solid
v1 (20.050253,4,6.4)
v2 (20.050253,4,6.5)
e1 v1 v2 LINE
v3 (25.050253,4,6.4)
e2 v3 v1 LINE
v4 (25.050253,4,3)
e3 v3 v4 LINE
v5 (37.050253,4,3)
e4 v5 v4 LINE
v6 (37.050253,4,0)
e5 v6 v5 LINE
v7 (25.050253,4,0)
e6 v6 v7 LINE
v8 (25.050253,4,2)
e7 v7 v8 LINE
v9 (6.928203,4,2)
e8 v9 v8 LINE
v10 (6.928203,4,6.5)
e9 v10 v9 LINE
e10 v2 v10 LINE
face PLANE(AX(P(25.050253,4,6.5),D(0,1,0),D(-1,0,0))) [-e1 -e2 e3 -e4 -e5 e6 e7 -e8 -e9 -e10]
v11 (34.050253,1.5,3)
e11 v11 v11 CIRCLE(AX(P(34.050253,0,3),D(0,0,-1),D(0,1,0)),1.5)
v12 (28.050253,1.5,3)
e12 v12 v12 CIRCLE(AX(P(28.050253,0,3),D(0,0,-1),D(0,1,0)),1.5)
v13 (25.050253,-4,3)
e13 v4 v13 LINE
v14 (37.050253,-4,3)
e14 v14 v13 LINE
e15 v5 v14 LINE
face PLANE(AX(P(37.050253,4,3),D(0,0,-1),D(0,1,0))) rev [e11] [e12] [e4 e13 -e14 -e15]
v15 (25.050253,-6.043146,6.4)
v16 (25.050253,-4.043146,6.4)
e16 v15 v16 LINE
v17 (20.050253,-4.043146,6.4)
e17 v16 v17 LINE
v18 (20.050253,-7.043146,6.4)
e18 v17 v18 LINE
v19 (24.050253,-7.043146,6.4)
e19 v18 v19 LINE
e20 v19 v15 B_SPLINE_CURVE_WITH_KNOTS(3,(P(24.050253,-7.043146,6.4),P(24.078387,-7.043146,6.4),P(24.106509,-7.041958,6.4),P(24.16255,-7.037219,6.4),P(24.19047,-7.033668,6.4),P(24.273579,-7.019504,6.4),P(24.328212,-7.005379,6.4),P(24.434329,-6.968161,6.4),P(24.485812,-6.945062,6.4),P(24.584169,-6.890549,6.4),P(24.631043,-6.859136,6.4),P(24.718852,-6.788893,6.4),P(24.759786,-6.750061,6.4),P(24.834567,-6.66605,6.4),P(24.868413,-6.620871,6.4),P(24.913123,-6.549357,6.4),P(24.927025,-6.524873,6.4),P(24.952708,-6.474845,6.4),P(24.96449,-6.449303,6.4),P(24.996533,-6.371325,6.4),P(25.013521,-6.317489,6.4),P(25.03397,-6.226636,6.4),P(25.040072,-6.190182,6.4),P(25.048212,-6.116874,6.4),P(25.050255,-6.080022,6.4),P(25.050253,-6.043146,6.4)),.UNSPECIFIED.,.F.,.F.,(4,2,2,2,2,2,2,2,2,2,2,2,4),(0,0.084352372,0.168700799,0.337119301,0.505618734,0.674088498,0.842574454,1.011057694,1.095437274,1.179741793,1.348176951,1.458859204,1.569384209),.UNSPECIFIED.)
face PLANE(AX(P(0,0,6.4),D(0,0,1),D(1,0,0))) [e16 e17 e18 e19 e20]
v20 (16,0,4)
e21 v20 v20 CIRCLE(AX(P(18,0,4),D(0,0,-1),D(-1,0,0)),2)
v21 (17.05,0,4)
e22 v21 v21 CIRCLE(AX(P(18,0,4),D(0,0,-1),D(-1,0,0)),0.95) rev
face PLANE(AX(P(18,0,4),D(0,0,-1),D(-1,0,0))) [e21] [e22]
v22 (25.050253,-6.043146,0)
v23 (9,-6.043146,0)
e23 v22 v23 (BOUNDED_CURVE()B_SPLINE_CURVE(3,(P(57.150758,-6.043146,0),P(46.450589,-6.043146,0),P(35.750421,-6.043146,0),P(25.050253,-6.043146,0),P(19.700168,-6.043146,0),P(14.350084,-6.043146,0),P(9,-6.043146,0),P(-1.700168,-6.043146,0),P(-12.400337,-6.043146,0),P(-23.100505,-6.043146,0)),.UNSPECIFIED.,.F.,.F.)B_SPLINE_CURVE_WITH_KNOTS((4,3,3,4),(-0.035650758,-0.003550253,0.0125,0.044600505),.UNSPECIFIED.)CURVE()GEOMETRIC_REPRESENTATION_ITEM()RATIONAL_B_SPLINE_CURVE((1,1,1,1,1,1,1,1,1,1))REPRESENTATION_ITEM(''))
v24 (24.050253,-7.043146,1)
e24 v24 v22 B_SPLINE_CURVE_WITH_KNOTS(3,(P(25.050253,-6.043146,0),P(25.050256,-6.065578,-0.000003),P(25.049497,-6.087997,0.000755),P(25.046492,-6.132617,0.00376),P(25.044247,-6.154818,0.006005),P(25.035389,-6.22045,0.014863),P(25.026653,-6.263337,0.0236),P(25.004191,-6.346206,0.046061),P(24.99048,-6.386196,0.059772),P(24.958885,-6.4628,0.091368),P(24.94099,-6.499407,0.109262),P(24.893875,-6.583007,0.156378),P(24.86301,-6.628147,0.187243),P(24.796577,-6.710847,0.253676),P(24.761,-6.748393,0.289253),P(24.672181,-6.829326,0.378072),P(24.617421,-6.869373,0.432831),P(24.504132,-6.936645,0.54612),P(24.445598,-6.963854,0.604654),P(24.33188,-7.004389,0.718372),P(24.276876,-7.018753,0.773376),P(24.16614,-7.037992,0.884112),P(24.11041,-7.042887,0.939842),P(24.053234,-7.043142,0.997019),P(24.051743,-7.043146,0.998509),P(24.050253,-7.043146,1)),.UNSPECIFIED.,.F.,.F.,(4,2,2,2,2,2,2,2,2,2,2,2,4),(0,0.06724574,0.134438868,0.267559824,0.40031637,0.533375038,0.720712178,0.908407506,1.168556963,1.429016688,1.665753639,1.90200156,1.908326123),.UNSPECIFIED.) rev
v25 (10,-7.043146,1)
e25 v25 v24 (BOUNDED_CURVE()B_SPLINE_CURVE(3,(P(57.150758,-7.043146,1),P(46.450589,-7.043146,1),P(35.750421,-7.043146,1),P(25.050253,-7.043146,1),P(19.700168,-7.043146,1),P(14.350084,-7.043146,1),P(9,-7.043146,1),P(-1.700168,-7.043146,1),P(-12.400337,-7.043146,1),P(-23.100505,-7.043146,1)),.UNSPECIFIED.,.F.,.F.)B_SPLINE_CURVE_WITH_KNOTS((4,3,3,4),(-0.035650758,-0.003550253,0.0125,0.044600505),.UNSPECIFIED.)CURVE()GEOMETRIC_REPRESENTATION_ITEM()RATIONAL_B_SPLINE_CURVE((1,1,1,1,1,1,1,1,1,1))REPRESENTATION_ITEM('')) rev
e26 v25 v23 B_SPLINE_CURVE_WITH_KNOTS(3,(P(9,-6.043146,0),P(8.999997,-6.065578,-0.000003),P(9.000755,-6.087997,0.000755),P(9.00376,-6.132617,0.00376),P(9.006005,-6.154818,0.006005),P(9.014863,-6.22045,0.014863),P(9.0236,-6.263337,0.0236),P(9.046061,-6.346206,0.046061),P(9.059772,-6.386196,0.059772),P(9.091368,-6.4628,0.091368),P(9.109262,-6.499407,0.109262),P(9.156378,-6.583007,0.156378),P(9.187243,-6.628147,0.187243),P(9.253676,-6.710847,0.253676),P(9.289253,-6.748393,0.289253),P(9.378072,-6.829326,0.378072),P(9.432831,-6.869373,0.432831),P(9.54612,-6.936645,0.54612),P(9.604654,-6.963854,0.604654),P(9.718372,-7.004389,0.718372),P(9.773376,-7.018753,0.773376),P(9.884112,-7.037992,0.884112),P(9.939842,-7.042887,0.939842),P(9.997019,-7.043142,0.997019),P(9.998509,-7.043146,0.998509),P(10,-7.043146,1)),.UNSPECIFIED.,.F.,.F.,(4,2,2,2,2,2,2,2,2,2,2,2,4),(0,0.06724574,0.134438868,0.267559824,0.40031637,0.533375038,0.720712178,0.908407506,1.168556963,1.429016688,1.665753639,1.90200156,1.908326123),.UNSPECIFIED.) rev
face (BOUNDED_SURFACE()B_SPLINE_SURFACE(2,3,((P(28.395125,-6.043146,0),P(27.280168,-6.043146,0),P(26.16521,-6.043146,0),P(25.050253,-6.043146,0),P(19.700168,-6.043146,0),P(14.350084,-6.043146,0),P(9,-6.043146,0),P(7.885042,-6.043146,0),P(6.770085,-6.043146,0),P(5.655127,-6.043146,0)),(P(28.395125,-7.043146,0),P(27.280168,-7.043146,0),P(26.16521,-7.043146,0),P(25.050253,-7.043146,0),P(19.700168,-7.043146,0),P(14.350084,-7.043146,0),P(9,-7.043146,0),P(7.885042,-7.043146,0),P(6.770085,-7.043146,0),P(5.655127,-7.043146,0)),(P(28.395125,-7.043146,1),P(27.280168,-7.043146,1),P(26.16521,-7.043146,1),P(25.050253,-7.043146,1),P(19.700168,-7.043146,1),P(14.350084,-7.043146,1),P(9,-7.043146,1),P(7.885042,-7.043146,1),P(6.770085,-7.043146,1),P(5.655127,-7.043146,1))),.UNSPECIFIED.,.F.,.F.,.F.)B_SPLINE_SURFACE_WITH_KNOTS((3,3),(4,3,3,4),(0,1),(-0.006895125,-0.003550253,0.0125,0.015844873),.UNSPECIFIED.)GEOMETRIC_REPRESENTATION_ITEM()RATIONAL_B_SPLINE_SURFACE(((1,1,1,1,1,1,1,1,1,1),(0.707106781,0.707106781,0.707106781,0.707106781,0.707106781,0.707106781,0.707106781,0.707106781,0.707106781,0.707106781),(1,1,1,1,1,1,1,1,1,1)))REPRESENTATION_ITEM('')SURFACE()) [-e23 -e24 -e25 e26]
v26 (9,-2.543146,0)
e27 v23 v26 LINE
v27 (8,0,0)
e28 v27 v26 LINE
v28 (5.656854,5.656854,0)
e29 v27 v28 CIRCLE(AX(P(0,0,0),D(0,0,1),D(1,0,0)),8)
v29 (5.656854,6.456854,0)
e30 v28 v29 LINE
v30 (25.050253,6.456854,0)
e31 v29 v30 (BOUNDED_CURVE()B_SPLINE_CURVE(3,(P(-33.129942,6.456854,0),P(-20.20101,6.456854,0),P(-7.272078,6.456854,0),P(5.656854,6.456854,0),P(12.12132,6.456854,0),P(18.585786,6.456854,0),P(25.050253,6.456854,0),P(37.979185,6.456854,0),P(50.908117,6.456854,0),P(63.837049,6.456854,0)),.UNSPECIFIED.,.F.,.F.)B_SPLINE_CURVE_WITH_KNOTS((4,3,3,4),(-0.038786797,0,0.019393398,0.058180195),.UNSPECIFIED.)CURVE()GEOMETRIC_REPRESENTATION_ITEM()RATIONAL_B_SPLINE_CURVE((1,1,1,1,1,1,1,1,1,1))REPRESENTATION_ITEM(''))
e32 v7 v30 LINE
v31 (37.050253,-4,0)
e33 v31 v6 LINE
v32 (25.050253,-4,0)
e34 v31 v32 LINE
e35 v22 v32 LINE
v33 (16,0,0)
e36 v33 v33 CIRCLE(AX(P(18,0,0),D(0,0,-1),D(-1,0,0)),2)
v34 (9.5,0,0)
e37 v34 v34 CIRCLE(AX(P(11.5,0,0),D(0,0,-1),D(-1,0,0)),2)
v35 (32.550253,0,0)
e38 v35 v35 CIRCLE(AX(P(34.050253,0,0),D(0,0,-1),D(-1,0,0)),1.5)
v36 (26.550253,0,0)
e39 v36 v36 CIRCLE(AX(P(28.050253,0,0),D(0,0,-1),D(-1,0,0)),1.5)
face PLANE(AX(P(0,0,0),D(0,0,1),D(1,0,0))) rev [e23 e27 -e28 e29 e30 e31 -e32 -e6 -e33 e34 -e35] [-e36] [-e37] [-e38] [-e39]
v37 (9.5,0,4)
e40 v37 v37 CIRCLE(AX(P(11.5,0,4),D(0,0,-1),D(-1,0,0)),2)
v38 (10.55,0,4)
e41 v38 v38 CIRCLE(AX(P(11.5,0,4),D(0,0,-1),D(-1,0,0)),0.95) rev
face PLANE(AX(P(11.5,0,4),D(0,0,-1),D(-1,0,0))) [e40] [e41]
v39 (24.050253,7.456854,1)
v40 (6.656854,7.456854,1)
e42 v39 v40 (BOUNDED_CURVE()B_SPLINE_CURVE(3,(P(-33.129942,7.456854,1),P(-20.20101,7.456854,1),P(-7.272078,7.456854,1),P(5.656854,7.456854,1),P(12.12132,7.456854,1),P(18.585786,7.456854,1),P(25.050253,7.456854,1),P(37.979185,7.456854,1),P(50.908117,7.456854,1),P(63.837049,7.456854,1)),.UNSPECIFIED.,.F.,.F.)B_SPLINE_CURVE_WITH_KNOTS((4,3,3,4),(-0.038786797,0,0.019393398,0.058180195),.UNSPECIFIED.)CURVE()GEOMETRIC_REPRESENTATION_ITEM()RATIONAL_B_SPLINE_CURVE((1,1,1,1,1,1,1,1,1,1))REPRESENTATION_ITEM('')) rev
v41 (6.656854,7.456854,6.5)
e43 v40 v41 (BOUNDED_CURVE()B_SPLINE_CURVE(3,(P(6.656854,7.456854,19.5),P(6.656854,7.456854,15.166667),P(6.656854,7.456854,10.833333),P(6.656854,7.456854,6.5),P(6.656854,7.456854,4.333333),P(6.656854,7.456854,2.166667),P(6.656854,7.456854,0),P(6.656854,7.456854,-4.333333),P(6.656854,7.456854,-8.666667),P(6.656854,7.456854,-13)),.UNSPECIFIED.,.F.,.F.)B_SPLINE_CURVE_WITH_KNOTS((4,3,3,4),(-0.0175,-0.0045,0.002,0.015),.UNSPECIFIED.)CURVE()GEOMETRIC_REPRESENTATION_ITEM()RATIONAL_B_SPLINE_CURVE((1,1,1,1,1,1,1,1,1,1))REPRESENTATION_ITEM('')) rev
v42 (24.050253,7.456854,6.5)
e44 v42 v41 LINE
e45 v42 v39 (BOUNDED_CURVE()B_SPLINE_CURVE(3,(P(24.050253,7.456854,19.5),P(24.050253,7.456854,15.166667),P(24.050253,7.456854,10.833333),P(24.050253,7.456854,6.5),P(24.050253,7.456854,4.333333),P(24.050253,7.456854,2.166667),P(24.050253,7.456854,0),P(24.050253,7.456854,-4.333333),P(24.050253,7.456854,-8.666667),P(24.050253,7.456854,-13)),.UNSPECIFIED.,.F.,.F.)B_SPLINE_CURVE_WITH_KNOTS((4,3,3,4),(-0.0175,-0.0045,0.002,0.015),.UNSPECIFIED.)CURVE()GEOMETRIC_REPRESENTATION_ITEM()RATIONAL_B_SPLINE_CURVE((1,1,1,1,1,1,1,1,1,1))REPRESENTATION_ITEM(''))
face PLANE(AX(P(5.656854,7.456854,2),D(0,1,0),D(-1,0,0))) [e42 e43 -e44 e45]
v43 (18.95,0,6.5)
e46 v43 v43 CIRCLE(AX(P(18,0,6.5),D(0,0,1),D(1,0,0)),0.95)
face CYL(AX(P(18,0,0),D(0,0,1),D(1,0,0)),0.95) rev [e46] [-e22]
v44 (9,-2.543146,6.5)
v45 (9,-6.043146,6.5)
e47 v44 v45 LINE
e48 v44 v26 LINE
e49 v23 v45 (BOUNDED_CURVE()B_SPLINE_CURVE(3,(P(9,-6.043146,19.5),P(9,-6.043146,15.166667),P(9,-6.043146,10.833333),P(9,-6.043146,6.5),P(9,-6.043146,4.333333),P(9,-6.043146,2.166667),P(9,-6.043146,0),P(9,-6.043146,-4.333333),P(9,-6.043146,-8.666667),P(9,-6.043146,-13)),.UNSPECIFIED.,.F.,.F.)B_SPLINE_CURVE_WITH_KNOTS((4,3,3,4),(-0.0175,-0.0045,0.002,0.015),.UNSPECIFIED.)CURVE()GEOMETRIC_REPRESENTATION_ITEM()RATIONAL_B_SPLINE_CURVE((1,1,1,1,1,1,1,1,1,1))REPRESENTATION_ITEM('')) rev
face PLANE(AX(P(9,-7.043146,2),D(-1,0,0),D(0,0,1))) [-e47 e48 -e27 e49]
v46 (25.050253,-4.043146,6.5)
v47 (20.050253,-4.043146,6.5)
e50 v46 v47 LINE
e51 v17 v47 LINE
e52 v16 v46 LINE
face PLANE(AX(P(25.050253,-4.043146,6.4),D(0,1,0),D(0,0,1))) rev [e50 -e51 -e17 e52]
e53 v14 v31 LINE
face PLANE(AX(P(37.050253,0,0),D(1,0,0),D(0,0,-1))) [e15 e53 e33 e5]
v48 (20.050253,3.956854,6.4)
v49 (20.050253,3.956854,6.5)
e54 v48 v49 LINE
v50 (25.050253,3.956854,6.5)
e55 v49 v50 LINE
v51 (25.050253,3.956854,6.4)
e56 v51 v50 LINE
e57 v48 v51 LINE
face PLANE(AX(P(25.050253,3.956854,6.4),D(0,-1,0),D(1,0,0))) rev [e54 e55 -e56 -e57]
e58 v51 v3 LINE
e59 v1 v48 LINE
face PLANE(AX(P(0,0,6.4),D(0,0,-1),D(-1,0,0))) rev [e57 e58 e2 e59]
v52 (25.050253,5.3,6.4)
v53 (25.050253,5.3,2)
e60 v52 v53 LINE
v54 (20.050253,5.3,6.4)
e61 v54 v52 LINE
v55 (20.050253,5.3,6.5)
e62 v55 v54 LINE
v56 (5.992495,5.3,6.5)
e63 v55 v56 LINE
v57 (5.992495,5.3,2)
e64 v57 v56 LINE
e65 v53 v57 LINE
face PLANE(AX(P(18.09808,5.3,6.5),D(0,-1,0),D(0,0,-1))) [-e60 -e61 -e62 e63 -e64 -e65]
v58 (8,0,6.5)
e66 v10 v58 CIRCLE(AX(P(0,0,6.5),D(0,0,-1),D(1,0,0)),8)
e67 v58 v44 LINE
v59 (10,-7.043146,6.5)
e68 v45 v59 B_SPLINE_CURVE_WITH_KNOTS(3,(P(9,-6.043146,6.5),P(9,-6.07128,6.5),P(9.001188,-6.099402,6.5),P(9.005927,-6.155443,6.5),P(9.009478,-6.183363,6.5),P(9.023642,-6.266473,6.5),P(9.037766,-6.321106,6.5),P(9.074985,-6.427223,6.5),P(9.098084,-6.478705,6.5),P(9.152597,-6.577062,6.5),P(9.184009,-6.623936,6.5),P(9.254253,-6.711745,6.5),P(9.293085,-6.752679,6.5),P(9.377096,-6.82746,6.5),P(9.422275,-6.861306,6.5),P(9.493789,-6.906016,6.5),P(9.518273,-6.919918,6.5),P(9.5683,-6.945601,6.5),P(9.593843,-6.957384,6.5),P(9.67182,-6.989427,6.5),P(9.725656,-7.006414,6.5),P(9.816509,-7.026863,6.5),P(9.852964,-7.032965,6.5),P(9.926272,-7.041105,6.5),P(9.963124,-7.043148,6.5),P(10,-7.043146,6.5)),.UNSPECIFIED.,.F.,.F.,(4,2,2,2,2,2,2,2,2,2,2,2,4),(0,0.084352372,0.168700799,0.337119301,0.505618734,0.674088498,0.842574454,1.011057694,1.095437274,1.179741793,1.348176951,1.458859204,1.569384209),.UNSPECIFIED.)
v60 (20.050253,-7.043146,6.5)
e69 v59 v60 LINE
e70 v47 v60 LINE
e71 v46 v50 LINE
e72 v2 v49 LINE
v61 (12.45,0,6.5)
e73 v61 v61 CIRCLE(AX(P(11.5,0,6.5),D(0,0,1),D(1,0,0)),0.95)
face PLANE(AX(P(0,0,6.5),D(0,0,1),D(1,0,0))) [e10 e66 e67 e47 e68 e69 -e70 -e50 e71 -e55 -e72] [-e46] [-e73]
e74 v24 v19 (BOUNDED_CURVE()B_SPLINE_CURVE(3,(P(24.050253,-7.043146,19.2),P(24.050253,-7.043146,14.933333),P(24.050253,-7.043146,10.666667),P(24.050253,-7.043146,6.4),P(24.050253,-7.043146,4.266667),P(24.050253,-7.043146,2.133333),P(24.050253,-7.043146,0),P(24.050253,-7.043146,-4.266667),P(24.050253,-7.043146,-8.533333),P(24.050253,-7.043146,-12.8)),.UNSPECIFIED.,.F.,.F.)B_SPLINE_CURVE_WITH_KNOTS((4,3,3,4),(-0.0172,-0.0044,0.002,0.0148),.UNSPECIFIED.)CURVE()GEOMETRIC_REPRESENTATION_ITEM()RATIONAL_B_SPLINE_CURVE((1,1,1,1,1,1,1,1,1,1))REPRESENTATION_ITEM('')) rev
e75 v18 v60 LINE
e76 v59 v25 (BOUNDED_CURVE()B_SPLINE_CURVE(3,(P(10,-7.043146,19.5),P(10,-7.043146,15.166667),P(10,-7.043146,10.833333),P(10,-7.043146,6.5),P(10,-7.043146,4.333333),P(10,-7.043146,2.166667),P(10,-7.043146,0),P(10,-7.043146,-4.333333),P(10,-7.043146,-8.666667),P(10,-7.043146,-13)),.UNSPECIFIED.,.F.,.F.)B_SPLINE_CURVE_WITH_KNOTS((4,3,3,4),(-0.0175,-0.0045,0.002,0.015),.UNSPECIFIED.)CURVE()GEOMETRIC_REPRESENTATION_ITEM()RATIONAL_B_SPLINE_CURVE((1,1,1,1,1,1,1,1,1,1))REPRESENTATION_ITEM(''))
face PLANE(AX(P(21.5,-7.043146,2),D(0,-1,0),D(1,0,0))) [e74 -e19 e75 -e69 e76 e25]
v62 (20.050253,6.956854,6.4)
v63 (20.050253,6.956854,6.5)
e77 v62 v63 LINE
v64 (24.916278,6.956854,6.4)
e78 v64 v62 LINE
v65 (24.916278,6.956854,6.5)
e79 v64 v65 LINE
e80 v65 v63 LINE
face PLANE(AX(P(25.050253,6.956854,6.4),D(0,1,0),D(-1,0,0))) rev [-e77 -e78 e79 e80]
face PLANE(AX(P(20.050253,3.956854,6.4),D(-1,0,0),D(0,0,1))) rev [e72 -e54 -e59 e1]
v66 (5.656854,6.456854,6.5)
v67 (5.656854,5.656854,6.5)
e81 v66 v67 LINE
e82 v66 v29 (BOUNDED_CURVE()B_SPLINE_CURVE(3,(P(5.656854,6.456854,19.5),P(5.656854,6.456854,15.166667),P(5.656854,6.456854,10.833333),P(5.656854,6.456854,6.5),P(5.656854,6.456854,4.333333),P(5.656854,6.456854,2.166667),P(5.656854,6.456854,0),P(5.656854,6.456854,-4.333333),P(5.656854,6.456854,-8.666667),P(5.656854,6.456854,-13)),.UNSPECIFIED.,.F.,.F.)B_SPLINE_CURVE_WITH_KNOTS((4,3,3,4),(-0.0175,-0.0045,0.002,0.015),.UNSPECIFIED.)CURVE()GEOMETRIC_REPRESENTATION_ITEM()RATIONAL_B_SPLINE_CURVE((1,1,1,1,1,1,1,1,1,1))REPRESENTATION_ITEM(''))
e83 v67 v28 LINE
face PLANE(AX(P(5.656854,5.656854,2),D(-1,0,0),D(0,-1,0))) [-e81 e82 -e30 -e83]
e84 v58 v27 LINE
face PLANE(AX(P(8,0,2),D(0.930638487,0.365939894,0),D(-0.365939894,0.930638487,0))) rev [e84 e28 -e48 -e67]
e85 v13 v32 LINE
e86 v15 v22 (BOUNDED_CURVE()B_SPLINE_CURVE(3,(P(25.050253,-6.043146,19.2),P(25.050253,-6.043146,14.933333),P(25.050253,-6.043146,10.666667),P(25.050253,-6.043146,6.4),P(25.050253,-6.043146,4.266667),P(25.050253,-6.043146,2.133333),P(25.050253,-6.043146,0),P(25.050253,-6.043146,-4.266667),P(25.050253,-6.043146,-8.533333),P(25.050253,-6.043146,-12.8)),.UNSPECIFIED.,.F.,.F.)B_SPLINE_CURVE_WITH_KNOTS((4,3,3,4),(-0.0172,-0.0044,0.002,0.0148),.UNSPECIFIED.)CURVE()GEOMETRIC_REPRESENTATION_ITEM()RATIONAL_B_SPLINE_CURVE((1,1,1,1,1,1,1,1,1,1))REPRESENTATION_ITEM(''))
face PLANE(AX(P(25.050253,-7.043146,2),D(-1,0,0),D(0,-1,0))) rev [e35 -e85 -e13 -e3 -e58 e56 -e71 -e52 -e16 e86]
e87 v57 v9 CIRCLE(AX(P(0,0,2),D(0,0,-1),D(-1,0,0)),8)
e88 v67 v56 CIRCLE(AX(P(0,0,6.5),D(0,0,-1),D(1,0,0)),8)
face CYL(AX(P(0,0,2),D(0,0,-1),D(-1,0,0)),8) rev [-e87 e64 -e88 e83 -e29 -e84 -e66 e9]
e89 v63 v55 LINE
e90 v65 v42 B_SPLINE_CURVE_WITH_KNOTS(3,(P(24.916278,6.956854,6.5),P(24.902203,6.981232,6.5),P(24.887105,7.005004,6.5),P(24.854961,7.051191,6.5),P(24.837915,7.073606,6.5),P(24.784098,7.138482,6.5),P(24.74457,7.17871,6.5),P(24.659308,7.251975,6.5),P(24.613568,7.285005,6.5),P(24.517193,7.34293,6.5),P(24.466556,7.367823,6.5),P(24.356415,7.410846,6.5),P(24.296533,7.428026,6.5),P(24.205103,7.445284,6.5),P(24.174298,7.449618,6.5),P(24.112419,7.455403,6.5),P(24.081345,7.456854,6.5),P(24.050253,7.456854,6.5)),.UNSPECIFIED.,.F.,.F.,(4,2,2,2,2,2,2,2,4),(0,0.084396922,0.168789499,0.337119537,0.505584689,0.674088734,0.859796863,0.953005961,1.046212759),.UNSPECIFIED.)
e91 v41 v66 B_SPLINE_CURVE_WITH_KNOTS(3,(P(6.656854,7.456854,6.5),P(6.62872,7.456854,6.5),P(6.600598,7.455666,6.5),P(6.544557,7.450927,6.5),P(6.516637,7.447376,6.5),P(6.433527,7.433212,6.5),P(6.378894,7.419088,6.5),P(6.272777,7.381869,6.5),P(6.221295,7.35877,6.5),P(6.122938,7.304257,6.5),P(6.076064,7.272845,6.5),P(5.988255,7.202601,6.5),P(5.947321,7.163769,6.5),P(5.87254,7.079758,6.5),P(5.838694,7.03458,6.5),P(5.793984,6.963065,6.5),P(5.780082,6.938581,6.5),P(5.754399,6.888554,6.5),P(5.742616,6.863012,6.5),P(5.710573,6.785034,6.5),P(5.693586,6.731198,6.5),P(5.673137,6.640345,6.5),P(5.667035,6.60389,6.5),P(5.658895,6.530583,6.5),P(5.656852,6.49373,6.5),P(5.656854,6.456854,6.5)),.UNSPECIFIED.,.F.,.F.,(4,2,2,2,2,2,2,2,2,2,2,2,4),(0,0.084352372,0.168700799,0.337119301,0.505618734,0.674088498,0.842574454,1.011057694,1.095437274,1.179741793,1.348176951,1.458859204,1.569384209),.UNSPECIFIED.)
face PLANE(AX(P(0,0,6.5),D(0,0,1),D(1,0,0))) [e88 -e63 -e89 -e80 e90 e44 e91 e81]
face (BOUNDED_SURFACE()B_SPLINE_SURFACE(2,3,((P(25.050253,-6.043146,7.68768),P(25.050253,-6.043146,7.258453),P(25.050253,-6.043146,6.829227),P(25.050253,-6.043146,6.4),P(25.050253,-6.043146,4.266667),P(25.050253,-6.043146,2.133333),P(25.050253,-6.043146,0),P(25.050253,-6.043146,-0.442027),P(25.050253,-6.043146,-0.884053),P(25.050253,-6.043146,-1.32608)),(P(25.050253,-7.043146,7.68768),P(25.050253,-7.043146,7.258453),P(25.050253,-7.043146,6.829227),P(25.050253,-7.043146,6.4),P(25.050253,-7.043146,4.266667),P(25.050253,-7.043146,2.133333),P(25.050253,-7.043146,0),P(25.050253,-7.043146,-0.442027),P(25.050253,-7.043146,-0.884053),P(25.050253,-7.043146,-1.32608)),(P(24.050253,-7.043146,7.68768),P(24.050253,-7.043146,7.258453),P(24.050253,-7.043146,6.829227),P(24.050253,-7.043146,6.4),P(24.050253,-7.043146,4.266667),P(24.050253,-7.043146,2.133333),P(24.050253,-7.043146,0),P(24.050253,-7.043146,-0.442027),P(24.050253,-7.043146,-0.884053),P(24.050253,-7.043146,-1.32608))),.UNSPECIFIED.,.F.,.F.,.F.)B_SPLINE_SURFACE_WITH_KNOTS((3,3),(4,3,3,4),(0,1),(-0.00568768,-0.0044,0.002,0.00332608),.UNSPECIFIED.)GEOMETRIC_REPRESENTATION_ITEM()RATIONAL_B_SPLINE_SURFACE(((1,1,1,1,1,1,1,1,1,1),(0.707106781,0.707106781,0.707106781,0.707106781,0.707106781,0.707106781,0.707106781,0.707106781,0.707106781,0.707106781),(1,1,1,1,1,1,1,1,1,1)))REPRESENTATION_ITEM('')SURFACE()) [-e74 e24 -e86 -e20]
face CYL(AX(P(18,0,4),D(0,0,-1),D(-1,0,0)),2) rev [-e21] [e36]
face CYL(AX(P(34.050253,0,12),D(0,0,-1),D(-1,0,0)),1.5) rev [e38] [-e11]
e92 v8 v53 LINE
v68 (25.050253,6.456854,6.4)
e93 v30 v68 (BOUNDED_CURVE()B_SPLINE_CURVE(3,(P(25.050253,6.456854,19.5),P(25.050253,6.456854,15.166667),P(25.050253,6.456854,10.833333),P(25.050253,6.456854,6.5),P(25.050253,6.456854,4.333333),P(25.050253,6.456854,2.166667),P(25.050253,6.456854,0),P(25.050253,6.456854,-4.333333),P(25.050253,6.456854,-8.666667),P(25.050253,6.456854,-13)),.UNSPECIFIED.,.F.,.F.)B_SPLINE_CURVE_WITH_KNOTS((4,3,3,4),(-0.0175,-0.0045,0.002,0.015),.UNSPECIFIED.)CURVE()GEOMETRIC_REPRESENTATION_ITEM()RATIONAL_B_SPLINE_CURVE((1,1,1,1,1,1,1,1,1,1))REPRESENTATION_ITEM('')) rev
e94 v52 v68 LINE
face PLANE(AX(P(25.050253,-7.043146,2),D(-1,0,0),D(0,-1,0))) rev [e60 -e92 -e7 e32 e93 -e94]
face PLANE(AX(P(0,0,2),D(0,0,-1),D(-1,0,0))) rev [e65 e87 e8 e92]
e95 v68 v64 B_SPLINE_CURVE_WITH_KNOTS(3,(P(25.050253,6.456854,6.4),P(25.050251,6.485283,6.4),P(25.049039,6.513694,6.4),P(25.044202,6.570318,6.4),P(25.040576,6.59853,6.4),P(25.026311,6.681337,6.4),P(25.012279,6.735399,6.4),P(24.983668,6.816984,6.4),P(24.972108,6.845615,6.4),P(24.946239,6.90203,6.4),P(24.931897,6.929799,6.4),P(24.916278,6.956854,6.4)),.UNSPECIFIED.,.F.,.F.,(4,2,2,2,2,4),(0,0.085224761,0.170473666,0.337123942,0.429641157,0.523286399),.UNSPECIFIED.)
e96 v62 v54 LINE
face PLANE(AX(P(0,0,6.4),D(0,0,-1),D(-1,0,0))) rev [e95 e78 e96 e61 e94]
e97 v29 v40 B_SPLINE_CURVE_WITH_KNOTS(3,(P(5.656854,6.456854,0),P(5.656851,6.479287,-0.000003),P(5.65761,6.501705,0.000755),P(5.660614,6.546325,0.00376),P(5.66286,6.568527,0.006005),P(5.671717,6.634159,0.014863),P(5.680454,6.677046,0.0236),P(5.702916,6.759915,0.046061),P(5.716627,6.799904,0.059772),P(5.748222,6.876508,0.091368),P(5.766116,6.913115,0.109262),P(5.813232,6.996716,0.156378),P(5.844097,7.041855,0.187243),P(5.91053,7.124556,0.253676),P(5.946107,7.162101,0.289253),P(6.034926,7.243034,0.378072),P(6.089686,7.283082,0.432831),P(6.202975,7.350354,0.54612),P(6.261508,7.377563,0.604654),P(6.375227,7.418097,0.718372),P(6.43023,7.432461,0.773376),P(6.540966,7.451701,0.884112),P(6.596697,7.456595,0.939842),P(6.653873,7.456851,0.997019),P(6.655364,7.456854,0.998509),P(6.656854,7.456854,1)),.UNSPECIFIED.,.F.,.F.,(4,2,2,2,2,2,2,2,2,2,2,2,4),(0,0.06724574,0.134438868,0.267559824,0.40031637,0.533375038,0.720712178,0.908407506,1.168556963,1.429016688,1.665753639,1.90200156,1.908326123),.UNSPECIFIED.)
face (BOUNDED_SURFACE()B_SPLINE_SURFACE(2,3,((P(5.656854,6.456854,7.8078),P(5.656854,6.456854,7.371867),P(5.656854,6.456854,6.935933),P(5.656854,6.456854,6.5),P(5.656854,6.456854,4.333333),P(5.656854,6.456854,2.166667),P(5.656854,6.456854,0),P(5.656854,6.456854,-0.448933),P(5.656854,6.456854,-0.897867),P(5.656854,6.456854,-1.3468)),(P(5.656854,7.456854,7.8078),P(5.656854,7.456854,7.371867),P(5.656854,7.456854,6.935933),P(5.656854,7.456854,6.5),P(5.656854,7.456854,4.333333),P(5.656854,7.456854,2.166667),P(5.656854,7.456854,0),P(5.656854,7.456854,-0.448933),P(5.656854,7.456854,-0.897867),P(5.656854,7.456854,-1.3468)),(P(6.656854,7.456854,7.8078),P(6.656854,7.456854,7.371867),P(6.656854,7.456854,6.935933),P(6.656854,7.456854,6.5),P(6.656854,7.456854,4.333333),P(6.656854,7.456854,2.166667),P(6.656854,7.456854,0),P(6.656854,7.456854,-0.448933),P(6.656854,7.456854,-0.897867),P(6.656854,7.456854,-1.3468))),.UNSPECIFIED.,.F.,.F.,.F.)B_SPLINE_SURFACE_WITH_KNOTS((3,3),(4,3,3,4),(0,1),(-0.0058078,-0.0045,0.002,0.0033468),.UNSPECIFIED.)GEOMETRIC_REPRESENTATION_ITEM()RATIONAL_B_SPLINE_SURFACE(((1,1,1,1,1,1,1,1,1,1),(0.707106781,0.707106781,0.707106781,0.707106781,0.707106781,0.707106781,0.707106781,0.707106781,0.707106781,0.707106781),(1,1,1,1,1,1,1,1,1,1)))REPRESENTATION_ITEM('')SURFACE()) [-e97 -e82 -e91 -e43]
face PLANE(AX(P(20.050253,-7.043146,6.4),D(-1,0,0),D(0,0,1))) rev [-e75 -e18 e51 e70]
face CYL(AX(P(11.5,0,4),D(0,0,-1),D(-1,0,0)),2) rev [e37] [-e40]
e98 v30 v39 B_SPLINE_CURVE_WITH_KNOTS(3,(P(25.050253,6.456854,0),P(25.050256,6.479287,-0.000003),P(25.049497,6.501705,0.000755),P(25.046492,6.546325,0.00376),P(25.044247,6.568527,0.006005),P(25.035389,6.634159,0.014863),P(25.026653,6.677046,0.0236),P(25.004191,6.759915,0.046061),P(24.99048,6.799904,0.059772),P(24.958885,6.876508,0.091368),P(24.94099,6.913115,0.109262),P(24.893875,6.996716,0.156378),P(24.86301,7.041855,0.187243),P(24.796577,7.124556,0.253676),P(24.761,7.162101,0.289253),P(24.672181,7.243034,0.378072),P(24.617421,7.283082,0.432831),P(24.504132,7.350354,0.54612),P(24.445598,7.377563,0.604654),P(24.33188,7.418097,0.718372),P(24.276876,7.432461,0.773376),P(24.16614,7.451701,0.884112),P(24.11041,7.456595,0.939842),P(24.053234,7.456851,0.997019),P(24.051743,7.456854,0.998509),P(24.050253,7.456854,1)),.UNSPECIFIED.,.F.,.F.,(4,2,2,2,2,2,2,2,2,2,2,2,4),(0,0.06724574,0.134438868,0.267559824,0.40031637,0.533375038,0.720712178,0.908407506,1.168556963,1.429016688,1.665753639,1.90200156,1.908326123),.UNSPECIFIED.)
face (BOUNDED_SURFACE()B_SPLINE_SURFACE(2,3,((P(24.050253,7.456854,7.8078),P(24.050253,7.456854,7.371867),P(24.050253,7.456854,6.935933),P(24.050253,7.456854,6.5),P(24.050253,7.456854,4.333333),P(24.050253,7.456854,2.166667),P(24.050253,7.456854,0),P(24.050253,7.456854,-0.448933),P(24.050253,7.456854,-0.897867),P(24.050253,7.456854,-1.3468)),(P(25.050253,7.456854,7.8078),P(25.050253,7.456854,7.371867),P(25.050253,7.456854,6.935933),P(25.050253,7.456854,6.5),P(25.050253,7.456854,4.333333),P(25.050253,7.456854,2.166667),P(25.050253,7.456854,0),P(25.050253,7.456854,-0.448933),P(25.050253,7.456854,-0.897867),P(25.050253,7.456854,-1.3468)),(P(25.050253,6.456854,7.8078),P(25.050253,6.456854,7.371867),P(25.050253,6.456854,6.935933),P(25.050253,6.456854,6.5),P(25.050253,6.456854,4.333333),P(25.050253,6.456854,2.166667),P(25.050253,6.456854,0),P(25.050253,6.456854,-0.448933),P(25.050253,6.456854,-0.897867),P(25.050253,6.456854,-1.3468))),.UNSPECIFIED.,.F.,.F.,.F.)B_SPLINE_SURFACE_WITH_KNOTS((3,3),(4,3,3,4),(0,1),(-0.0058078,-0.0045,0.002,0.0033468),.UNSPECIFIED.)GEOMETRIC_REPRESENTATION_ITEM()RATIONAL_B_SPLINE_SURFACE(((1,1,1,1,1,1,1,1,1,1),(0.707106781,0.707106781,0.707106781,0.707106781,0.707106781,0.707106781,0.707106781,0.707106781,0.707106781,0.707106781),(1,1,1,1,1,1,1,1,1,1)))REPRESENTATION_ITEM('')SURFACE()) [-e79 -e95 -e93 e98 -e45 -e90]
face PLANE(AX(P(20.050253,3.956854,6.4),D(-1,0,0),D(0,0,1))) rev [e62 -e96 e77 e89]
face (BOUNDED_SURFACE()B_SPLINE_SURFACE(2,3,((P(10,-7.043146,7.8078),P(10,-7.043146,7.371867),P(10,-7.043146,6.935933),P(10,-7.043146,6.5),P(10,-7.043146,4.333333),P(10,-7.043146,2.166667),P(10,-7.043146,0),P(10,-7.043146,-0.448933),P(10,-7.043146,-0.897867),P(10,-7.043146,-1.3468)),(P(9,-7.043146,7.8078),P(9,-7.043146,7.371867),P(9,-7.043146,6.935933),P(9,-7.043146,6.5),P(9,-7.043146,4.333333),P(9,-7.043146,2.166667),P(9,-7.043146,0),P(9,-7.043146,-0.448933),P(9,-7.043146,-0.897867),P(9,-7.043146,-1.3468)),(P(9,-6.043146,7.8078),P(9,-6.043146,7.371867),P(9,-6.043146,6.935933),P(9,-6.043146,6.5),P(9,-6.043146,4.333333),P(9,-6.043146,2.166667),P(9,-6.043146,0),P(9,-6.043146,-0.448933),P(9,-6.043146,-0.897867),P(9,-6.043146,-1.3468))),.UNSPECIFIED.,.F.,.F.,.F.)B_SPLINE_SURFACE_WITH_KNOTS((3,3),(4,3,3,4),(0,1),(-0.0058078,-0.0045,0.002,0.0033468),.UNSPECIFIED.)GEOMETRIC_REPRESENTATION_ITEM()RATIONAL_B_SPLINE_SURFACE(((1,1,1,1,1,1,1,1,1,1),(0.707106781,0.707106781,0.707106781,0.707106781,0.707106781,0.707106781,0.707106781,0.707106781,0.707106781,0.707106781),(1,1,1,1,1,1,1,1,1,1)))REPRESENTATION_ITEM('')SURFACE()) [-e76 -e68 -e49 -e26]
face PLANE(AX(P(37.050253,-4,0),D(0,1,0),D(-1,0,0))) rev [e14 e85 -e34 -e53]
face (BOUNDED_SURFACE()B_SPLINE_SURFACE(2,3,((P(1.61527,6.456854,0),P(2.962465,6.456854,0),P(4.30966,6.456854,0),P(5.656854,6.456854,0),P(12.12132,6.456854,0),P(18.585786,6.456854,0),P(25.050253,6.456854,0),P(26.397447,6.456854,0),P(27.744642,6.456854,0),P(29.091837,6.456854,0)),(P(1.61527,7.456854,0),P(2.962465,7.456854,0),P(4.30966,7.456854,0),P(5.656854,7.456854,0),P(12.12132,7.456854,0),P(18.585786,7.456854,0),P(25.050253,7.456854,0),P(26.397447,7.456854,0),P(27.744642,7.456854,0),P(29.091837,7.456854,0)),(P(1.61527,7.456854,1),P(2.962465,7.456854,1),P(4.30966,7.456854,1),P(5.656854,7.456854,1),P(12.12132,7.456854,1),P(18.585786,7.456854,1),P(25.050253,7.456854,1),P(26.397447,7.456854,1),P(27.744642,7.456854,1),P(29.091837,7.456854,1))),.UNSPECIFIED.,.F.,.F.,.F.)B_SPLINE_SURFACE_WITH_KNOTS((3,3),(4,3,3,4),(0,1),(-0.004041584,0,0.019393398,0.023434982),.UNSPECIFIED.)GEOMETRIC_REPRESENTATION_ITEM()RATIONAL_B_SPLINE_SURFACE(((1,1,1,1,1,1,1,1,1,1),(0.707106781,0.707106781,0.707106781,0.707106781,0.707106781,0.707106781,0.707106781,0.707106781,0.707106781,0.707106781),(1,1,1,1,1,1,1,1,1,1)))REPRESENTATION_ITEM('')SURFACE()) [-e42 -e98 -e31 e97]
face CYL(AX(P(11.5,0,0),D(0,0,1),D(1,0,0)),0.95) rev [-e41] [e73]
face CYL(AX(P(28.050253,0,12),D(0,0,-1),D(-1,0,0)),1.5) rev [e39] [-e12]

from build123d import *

# Parameters (mm, degrees)
BOSS_EXTRUDE1_DEPTH      = 2
BOSS_EXTRUDE6_DEPTH      = 4.5
CUT_EXTRUDE6_DEPTH       = 4.5
BOSS_EXTRUDE14_DEPTH     = 2.3
SKETCH32_R               = 3
CUT_EXTRUDE7_DEPTH       = 2.3
SKETCH33_W               = 12.393398282201806
SKETCH33_H               = 2.000000000000001
BOSS_EXTRUDE15_DEPTH     = 1.2
CUT_EXTRUDE8_DEPTH       = 2.4
SKETCH43_R               = 2.5000000000000004
SKETCH43_R_2             = 2.4999999999999982
BOSS_EXTRUDE17_DEPTH     = 1.2
CUT_EXTRUDE11_DEPTH      = 29.420773915365164
CUT_EXTRUDE11_DEPTH_BACK = 29.420773915365164
SKETCH44_R               = 0.9499999999999992
SKETCH44_R_2             = 0.9500000000000008
SKETCH49_R               = 0.7500000000000021
CUT_EXTRUDE13_DEPTH      = 3
FILLET1_R                = 1.5
FILLET3_START            = -1
FILLET3_DEPTH            = 8
FILLET3_START_2          = 5
FILLET3_2_DEPTH          = 21
FILLET3_3_DEPTH          = 8
SKETCH45_R               = 1.9999999999999996
SKETCH45_R_2             = 2.000000000000003
CUT_EXTRUDE15_DEPTH      = 4
FILLET4_R                = 2
BOSS_EXTRUDE18_DEPTH     = 12
SKETCH52_R               = 1.500000000000004
SKETCH52_R_2             = 1.5000000000000007
CUT_EXTRUDE16_DEPTH      = 12


with BuildPart() as part:
    # Sketch3 → Boss-Extrude1 (new body)
    with BuildSketch(Plane.XY):
        with BuildLine():
            Line((8.000000000000002, 0), (8.999999999999995, -2.5431457505076205))
            Line((8.999999999999995, -2.5431457505076205), (8.999999999999995, -7.043145750507605))
            Line((8.999999999999995, -7.043145750507605), (21.50000000000004, -7.043145750507604))
            Line((21.50000000000004, -7.043145750507604), (25.05025253169418, -7.043145750507604))
            Line((25.05025253169418, -7.043145750507604), (25.050252531694177, 7.456854249492383))
            Line((25.050252531694177, 7.456854249492383), (5.656854249492373, 7.456854249492379))
            Line((5.656854249492373, 7.456854249492379), (5.656854249492376, 5.656854249492382))
            ThreePointArc((5.656854249492376, 5.656854249492382), (7.391036260090296, 3.061467458920721), (8.000000000000002, 0))
        make_face()
    extrude(amount=BOSS_EXTRUDE1_DEPTH)

    # Sketch22 → Boss-Extrude6 (add)
    with BuildSketch(Plane.XY.offset(2)):
        with BuildLine():
            Line((5.656854249492378, 7.456854249492383), (21.500000000000025, 7.456854249492383))
            Line((21.500000000000025, 7.456854249492383), (25.050252531694177, 7.456854249492383))
            Line((25.050252531694177, 7.456854249492383), (25.05025253169418, -7.043145750507604))
            Line((25.05025253169418, -7.043145750507604), (8.999999999999995, -7.043145750507605))
            Line((8.999999999999995, -7.043145750507605), (8.999999999999995, -2.5431457505076205))
            Line((8.999999999999995, -2.5431457505076205), (7.999999999999998, 0))
            ThreePointArc((7.999999999999998, 0), (7.391036260090291, 3.061467458920719), (5.656854249492376, 5.656854249492382))
            Line((5.656854249492376, 5.656854249492382), (5.656854249492378, 7.456854249492383))
        make_face()
    extrude(amount=BOSS_EXTRUDE6_DEPTH)

    # Sketch26 → Cut-Extrude6 (cut)
    with BuildSketch(Plane.XY.offset(2)):
        Polygon((18.098080447707712, 5.299999999999999), (2.5300524575164793, 5.299999999999999), (2.5300524575164793, 4), (18.098080447707712, 4), (25.05025253169419, 4.000000000000001), (25.05025253169419, 5.299999999999999), align=None)
    extrude(amount=CUT_EXTRUDE6_DEPTH, mode=Mode.SUBTRACT)


with BuildPart() as body_2:
    # Sketch31 → Boss-Extrude14 (new body)
    with BuildSketch(Plane.XY.offset(6.5)):
        with BuildLine():
            Line((2.4326880657739025, 5.656854247099344), (0.00016454221484158, 5.656854247099344))
            ThreePointArc((0.00016454221484158, 5.656854247099344), (-5.656854248894122, 8.227110743131e-05), (0, -5.656854249492382))
            Line((0, -5.656854249492382), (9.000000000000004, -5.656854249492382))
            Line((9.000000000000004, -5.656854249492382), (8.999999999999995, -7.043145750507605))
            Line((8.999999999999995, -7.043145750507605), (8.999999999999995, -8.543145750507605))
            Line((8.999999999999995, -8.543145750507605), (21.50000000000004, -8.543145750507605))
            Line((21.50000000000004, -8.543145750507605), (21.50000000000004, -7.043145750507605))
            Line((21.50000000000004, -7.043145750507605), (25.05025253169418, -7.043145750507604))
            Line((25.05025253169418, -7.043145750507604), (25.05025253169418, 8.956854249492379))
            Line((25.05025253169418, 8.956854249492379), (5.656854249492376, 8.956854249492379))
            Line((5.656854249492376, 8.956854249492379), (5.656854249492378, 7.456854249492383))
            Line((5.656854249492378, 7.456854249492383), (5.656854249492376, 5.613708498984764))
            Line((5.656854249492376, 5.613708498984764), (2.4326880657739025, 5.656854247099344))
        make_face()
    extrude(amount=BOSS_EXTRUDE14_DEPTH)

    # Sketch32 → Cut-Extrude7 (cut)
    with BuildSketch(Plane.XY.offset(8.799999999999999)):
        Circle(SKETCH32_R)
    extrude(amount=-CUT_EXTRUDE7_DEPTH, mode=Mode.SUBTRACT)

    # Sketch33 → Boss-Extrude15 (add)
    with BuildSketch(Plane.XY.offset(8.799999999999999)):
        with Locations((11.853553390593277, 7.956854249492379)):
            Rectangle(SKETCH33_W, SKETCH33_H)
        Polygon((9.000000000000004, -7.043145750507606), (9.000000000000004, -8.543145750507605), (18.05025253169418, -8.543145750507605), (18.05025253169418, -7.0431457505076045), align=None)
        with BuildLine():
            Line((7.000000000000003, -4.156854249492383), (18.05025253169419, -4.156854249492383))
            Line((18.05025253169419, -4.156854249492383), (18.05025253169419, -2.1568542494923824))
            Line((18.05025253169419, -2.1568542494923824), (7.000000000000003, -2.1568542494923832))
            ThreePointArc((7.000000000000003, -2.1568542494923832), (6.000000000000003, -3.1568542494923832), (7.000000000000003, -4.156854249492383))
        make_face()
        with BuildLine():
            Line((18.05025253169419, 2.172006245196199), (7.000000000000003, 2.172006245196201))
            ThreePointArc((7.000000000000003, 2.172006245196201), (6.0000000000000036, 3.1720062451962), (7.000000000000003, 4.172006245196199))
            Line((7.000000000000003, 4.172006245196199), (18.05025253169419, 4.172006245196199))
            Line((18.05025253169419, 4.172006245196199), (18.05025253169419, 2.172006245196199))
        make_face()
    extrude(amount=BOSS_EXTRUDE15_DEPTH)


with BuildPart() as cut_extrude8_tool:
    # Sketch35 → Cut-Extrude8 (new body)
    with BuildSketch(Plane.XY.offset(8.799999999999999)):
        Polygon((25.05025253169418, 3.956854249492379), (25.05025253169418, 6.9568542494923795), (20.05025253169418, 6.956854249492378), (20.05025253169418, 3.9568542494923773), align=None)
        Polygon((25.05025253169418, -7.043145750507604), (20.05025253169419, -7.0431457505076045), (20.05025253169419, -4.043145750507604), (25.05025253169418, -4.043145750507604), align=None)
    extrude(amount=-CUT_EXTRUDE8_DEPTH)


with BuildPart() as part_1:
    add(part.part)

    # Cut-Extrude8: cut by cut_extrude8_tool
    add(cut_extrude8_tool.part, mode=Mode.SUBTRACT)


with BuildPart() as body_2_1:
    add(body_2.part)

    # Cut-Extrude8: cut by cut_extrude8_tool
    add(cut_extrude8_tool.part, mode=Mode.SUBTRACT)

    # Sketch43 → Boss-Extrude17 (add)
    with BuildSketch(Plane.XY.offset(8.799999999999999)):
        with Locations((11.500000000000004, 0)):
            Circle(SKETCH43_R)
        with Locations((18.000000000000004, 0)):
            Circle(SKETCH43_R_2)
    extrude(amount=BOSS_EXTRUDE17_DEPTH)


with BuildPart() as cut_extrude11_tool:
    # Sketch44 → Cut-Extrude11 (new, two sides: drawn at the far end of the back side and taken through both)
    with BuildSketch(Plane.XY.offset(9.999999999999998).offset(-CUT_EXTRUDE11_DEPTH_BACK)):
        with Locations((11.500000000000004, 0)):
            Circle(SKETCH44_R)
        with Locations((18.000000000000004, 0)):
            Circle(SKETCH44_R_2)
    extrude(amount=CUT_EXTRUDE11_DEPTH + CUT_EXTRUDE11_DEPTH_BACK)


with BuildPart() as part_2:
    add(part_1.part)

    # Cut-Extrude11: cut by cut_extrude11_tool
    add(cut_extrude11_tool.part, mode=Mode.SUBTRACT)

    # Fillet3: read off the stored shape, not the designer's step
    # Fillet3 outline → Fillet3 (cut)
    with BuildSketch(Plane.XY.offset(FILLET3_START)):
        with BuildLine():
            Line((9, -7.043145751), (10, -7.043145751))
            add(Edge.make_bspline(
                [(10, -7.043145751), (8.99999999999999, -7.043145750507609), (9, -6.043145751)],
                knots=[0, 0, 0, 1, 1, 1], degree=2, weights=[1, 0.7071067811865481, 1]))
            Line((9, -6.043145751), (9, -7.043145751))
        make_face()
        with BuildLine():
            Line((5.656854249, 7.456854249), (5.656854249, 6.456854249))
            add(Edge.make_bspline(
                [(5.656854249, 6.456854249), (5.656854249492369, 7.4568542494923795), (6.656854249, 7.456854249)],
                knots=[0, 0, 0, 1, 1, 1], degree=2, weights=[1, 0.707106781186547, 1]))
            Line((6.656854249, 7.456854249), (5.656854249, 7.456854249))
        make_face()
    extrude(amount=FILLET3_DEPTH, mode=Mode.SUBTRACT)

    # Fillet3 2 outline → Fillet3 2 (cut)
    with BuildSketch(Plane.YZ.offset(FILLET3_START_2)):
        with BuildLine():
            Line((-7.043145751, 0), (-6.043145751, 0))
            add(Edge.make_bspline(
                [(-6.043145751, 0), (-7.0431457505076045, 0), (-7.043145751, 1)],
                knots=[0, 0, 0, 1, 1, 1], degree=2, weights=[1, 0.707106781186548, 1]))
            Line((-7.043145751, 1), (-7.043145751, 0))
        make_face()
        with BuildLine():
            add(Edge.make_bspline(
                [(6.456854249, 0), (7.456854249492381, 0), (7.456854249, 1)],
                knots=[0, 0, 0, 1, 1, 1], degree=2, weights=[1, 0.707106781186548, 1]))
            Line((6.456854249, 0), (7.456854249, 0))
            Line((7.456854249, 0), (7.456854249, 1))
        make_face()
    extrude(amount=FILLET3_2_DEPTH, mode=Mode.SUBTRACT)

    # Fillet3 3 outline → Fillet3 3 (cut)
    with BuildSketch(Plane.XY.offset(FILLET3_START)):
        with BuildLine():
            Line((25.050252532, -7.043145751), (25.050252532, -6.043145751))
            add(Edge.make_bspline(
                [(25.050252532, -6.043145751), (25.050252531694195, -7.0431457505076045), (24.050252532, -7.043145751)],
                knots=[0, 0, 0, 1, 1, 1], degree=2, weights=[1, 0.707106781186548, 1]))
            Line((24.050252532, -7.043145751), (25.050252532, -7.043145751))
        make_face()
        with BuildLine():
            Line((25.050252532, 6.456854249), (25.050252532, 7.456854249))
            Line((25.050252532, 7.456854249), (24.050252532, 7.456854249))
            add(Edge.make_bspline(
                [(24.050252532, 7.456854249), (24.23662286224227, 7.456854249492371), (24.442904569552457, 7.413222711328381), (24.646119560607424, 7.308816022097408), (24.808964717093836, 7.142726196138974), (24.971827345010716, 6.860639849810825), (25.01301948040526, 6.758429238057051), (25.038618001980854, 6.6546327736033515), (25.050252531694174, 6.553326631418876), (25.050252532, 6.456854249)],
                knots=[0, 0, 0, 0, 0, 0, 0.6589186227127712, 0.6589186227127712, 0.6589186227127712, 0.6589186227127712, 1.0000000000000395, 1.0000000000000395, 1.0000000000000395, 1.0000000000000395, 1.0000000000000395, 1.0000000000000395], degree=5, weights=[1, 1.0000000000000024, 0.9950915544751191, 0.9930584097693568, 0.9999999999999981, 1.0000000000000009, 0.9997935626898684, 0.9999244387002607, 0.9999999999999992, 1]))
        make_face()
    extrude(amount=FILLET3_3_DEPTH, mode=Mode.SUBTRACT)

    # Sketch45 → Cut-Extrude15 (cut)
    with BuildSketch(Plane(origin=(0, 0, 0), x_dir=(-1, 0, 0), z_dir=(0, 0, -1))):
        with Locations((-11.500000000000004, 0)):
            Circle(SKETCH45_R)
        with Locations((-18.000000000000004, 0)):
            Circle(SKETCH45_R_2)
    extrude(amount=-CUT_EXTRUDE15_DEPTH, mode=Mode.SUBTRACT)

    # Sketch51 → Boss-Extrude18 (add)
    with BuildSketch(Plane(origin=(25.05025253169418, 5.99e-15, 0), x_dir=(0, 0, -1), z_dir=(1, 2.4e-16, 0))):
        Polygon((-9.5e-16, 3.9999999999999947), (3e-17, -4.000000000000005), (-3, -4.000000000000005), (-3.000000000000001, 3.9999999999999942), align=None)
    extrude(amount=BOSS_EXTRUDE18_DEPTH)

    # Sketch52 → Cut-Extrude16 (cut)
    with BuildSketch(Plane(origin=(0, 0, 0), x_dir=(-1, 0, 0), z_dir=(0, 0, -1))):
        with Locations((-34.05025253169418, 3.47e-15)):
            Circle(SKETCH52_R)
        with Locations((-28.05025253169418, 3.9e-15)):
            Circle(SKETCH52_R_2)
    extrude(amount=-CUT_EXTRUDE16_DEPTH, mode=Mode.SUBTRACT)


with BuildPart() as body_2_2:
    add(body_2_1.part)

    # Cut-Extrude11: cut by cut_extrude11_tool
    add(cut_extrude11_tool.part, mode=Mode.SUBTRACT)

    # Sketch49 → Cut-Extrude13 (cut, along a direction that is not the sketch's normal)
    with BuildSketch(Plane.XZ.offset(-6.956854249492379)):
        with Locations((16.05025253169419, 9.999999999999998)):
            Circle(SKETCH49_R)
    extrude(amount=-CUT_EXTRUDE13_DEPTH, dir=(0.6858421465414155, -0.7277503349552398, 0), mode=Mode.SUBTRACT)

    # Fillet1
    fillet1_edges = [body_2_2.edges().sort_by_distance(p)[0] for p in [
        (15.353553390593278, 8.956854249492379, 6.5),
        (15.250000000000018, -8.543145750507605, 6.5),
    ]]
    fillet(fillet1_edges, radius=FILLET1_R)

    # Fillet4
    fillet4_edges = [body_2_2.edges().sort_by_distance(p)[0] for p in [
        (20.05025253169418, 5.456854249492378, 8.799999999999999),
        (20.05025253169419, -5.543145750507604, 8.799999999999999),
    ]]
    fillet(fillet4_edges, radius=FILLET4_R - 0.0001)  # a hair under: the kernel refuses the full size


solid = part_2.part
